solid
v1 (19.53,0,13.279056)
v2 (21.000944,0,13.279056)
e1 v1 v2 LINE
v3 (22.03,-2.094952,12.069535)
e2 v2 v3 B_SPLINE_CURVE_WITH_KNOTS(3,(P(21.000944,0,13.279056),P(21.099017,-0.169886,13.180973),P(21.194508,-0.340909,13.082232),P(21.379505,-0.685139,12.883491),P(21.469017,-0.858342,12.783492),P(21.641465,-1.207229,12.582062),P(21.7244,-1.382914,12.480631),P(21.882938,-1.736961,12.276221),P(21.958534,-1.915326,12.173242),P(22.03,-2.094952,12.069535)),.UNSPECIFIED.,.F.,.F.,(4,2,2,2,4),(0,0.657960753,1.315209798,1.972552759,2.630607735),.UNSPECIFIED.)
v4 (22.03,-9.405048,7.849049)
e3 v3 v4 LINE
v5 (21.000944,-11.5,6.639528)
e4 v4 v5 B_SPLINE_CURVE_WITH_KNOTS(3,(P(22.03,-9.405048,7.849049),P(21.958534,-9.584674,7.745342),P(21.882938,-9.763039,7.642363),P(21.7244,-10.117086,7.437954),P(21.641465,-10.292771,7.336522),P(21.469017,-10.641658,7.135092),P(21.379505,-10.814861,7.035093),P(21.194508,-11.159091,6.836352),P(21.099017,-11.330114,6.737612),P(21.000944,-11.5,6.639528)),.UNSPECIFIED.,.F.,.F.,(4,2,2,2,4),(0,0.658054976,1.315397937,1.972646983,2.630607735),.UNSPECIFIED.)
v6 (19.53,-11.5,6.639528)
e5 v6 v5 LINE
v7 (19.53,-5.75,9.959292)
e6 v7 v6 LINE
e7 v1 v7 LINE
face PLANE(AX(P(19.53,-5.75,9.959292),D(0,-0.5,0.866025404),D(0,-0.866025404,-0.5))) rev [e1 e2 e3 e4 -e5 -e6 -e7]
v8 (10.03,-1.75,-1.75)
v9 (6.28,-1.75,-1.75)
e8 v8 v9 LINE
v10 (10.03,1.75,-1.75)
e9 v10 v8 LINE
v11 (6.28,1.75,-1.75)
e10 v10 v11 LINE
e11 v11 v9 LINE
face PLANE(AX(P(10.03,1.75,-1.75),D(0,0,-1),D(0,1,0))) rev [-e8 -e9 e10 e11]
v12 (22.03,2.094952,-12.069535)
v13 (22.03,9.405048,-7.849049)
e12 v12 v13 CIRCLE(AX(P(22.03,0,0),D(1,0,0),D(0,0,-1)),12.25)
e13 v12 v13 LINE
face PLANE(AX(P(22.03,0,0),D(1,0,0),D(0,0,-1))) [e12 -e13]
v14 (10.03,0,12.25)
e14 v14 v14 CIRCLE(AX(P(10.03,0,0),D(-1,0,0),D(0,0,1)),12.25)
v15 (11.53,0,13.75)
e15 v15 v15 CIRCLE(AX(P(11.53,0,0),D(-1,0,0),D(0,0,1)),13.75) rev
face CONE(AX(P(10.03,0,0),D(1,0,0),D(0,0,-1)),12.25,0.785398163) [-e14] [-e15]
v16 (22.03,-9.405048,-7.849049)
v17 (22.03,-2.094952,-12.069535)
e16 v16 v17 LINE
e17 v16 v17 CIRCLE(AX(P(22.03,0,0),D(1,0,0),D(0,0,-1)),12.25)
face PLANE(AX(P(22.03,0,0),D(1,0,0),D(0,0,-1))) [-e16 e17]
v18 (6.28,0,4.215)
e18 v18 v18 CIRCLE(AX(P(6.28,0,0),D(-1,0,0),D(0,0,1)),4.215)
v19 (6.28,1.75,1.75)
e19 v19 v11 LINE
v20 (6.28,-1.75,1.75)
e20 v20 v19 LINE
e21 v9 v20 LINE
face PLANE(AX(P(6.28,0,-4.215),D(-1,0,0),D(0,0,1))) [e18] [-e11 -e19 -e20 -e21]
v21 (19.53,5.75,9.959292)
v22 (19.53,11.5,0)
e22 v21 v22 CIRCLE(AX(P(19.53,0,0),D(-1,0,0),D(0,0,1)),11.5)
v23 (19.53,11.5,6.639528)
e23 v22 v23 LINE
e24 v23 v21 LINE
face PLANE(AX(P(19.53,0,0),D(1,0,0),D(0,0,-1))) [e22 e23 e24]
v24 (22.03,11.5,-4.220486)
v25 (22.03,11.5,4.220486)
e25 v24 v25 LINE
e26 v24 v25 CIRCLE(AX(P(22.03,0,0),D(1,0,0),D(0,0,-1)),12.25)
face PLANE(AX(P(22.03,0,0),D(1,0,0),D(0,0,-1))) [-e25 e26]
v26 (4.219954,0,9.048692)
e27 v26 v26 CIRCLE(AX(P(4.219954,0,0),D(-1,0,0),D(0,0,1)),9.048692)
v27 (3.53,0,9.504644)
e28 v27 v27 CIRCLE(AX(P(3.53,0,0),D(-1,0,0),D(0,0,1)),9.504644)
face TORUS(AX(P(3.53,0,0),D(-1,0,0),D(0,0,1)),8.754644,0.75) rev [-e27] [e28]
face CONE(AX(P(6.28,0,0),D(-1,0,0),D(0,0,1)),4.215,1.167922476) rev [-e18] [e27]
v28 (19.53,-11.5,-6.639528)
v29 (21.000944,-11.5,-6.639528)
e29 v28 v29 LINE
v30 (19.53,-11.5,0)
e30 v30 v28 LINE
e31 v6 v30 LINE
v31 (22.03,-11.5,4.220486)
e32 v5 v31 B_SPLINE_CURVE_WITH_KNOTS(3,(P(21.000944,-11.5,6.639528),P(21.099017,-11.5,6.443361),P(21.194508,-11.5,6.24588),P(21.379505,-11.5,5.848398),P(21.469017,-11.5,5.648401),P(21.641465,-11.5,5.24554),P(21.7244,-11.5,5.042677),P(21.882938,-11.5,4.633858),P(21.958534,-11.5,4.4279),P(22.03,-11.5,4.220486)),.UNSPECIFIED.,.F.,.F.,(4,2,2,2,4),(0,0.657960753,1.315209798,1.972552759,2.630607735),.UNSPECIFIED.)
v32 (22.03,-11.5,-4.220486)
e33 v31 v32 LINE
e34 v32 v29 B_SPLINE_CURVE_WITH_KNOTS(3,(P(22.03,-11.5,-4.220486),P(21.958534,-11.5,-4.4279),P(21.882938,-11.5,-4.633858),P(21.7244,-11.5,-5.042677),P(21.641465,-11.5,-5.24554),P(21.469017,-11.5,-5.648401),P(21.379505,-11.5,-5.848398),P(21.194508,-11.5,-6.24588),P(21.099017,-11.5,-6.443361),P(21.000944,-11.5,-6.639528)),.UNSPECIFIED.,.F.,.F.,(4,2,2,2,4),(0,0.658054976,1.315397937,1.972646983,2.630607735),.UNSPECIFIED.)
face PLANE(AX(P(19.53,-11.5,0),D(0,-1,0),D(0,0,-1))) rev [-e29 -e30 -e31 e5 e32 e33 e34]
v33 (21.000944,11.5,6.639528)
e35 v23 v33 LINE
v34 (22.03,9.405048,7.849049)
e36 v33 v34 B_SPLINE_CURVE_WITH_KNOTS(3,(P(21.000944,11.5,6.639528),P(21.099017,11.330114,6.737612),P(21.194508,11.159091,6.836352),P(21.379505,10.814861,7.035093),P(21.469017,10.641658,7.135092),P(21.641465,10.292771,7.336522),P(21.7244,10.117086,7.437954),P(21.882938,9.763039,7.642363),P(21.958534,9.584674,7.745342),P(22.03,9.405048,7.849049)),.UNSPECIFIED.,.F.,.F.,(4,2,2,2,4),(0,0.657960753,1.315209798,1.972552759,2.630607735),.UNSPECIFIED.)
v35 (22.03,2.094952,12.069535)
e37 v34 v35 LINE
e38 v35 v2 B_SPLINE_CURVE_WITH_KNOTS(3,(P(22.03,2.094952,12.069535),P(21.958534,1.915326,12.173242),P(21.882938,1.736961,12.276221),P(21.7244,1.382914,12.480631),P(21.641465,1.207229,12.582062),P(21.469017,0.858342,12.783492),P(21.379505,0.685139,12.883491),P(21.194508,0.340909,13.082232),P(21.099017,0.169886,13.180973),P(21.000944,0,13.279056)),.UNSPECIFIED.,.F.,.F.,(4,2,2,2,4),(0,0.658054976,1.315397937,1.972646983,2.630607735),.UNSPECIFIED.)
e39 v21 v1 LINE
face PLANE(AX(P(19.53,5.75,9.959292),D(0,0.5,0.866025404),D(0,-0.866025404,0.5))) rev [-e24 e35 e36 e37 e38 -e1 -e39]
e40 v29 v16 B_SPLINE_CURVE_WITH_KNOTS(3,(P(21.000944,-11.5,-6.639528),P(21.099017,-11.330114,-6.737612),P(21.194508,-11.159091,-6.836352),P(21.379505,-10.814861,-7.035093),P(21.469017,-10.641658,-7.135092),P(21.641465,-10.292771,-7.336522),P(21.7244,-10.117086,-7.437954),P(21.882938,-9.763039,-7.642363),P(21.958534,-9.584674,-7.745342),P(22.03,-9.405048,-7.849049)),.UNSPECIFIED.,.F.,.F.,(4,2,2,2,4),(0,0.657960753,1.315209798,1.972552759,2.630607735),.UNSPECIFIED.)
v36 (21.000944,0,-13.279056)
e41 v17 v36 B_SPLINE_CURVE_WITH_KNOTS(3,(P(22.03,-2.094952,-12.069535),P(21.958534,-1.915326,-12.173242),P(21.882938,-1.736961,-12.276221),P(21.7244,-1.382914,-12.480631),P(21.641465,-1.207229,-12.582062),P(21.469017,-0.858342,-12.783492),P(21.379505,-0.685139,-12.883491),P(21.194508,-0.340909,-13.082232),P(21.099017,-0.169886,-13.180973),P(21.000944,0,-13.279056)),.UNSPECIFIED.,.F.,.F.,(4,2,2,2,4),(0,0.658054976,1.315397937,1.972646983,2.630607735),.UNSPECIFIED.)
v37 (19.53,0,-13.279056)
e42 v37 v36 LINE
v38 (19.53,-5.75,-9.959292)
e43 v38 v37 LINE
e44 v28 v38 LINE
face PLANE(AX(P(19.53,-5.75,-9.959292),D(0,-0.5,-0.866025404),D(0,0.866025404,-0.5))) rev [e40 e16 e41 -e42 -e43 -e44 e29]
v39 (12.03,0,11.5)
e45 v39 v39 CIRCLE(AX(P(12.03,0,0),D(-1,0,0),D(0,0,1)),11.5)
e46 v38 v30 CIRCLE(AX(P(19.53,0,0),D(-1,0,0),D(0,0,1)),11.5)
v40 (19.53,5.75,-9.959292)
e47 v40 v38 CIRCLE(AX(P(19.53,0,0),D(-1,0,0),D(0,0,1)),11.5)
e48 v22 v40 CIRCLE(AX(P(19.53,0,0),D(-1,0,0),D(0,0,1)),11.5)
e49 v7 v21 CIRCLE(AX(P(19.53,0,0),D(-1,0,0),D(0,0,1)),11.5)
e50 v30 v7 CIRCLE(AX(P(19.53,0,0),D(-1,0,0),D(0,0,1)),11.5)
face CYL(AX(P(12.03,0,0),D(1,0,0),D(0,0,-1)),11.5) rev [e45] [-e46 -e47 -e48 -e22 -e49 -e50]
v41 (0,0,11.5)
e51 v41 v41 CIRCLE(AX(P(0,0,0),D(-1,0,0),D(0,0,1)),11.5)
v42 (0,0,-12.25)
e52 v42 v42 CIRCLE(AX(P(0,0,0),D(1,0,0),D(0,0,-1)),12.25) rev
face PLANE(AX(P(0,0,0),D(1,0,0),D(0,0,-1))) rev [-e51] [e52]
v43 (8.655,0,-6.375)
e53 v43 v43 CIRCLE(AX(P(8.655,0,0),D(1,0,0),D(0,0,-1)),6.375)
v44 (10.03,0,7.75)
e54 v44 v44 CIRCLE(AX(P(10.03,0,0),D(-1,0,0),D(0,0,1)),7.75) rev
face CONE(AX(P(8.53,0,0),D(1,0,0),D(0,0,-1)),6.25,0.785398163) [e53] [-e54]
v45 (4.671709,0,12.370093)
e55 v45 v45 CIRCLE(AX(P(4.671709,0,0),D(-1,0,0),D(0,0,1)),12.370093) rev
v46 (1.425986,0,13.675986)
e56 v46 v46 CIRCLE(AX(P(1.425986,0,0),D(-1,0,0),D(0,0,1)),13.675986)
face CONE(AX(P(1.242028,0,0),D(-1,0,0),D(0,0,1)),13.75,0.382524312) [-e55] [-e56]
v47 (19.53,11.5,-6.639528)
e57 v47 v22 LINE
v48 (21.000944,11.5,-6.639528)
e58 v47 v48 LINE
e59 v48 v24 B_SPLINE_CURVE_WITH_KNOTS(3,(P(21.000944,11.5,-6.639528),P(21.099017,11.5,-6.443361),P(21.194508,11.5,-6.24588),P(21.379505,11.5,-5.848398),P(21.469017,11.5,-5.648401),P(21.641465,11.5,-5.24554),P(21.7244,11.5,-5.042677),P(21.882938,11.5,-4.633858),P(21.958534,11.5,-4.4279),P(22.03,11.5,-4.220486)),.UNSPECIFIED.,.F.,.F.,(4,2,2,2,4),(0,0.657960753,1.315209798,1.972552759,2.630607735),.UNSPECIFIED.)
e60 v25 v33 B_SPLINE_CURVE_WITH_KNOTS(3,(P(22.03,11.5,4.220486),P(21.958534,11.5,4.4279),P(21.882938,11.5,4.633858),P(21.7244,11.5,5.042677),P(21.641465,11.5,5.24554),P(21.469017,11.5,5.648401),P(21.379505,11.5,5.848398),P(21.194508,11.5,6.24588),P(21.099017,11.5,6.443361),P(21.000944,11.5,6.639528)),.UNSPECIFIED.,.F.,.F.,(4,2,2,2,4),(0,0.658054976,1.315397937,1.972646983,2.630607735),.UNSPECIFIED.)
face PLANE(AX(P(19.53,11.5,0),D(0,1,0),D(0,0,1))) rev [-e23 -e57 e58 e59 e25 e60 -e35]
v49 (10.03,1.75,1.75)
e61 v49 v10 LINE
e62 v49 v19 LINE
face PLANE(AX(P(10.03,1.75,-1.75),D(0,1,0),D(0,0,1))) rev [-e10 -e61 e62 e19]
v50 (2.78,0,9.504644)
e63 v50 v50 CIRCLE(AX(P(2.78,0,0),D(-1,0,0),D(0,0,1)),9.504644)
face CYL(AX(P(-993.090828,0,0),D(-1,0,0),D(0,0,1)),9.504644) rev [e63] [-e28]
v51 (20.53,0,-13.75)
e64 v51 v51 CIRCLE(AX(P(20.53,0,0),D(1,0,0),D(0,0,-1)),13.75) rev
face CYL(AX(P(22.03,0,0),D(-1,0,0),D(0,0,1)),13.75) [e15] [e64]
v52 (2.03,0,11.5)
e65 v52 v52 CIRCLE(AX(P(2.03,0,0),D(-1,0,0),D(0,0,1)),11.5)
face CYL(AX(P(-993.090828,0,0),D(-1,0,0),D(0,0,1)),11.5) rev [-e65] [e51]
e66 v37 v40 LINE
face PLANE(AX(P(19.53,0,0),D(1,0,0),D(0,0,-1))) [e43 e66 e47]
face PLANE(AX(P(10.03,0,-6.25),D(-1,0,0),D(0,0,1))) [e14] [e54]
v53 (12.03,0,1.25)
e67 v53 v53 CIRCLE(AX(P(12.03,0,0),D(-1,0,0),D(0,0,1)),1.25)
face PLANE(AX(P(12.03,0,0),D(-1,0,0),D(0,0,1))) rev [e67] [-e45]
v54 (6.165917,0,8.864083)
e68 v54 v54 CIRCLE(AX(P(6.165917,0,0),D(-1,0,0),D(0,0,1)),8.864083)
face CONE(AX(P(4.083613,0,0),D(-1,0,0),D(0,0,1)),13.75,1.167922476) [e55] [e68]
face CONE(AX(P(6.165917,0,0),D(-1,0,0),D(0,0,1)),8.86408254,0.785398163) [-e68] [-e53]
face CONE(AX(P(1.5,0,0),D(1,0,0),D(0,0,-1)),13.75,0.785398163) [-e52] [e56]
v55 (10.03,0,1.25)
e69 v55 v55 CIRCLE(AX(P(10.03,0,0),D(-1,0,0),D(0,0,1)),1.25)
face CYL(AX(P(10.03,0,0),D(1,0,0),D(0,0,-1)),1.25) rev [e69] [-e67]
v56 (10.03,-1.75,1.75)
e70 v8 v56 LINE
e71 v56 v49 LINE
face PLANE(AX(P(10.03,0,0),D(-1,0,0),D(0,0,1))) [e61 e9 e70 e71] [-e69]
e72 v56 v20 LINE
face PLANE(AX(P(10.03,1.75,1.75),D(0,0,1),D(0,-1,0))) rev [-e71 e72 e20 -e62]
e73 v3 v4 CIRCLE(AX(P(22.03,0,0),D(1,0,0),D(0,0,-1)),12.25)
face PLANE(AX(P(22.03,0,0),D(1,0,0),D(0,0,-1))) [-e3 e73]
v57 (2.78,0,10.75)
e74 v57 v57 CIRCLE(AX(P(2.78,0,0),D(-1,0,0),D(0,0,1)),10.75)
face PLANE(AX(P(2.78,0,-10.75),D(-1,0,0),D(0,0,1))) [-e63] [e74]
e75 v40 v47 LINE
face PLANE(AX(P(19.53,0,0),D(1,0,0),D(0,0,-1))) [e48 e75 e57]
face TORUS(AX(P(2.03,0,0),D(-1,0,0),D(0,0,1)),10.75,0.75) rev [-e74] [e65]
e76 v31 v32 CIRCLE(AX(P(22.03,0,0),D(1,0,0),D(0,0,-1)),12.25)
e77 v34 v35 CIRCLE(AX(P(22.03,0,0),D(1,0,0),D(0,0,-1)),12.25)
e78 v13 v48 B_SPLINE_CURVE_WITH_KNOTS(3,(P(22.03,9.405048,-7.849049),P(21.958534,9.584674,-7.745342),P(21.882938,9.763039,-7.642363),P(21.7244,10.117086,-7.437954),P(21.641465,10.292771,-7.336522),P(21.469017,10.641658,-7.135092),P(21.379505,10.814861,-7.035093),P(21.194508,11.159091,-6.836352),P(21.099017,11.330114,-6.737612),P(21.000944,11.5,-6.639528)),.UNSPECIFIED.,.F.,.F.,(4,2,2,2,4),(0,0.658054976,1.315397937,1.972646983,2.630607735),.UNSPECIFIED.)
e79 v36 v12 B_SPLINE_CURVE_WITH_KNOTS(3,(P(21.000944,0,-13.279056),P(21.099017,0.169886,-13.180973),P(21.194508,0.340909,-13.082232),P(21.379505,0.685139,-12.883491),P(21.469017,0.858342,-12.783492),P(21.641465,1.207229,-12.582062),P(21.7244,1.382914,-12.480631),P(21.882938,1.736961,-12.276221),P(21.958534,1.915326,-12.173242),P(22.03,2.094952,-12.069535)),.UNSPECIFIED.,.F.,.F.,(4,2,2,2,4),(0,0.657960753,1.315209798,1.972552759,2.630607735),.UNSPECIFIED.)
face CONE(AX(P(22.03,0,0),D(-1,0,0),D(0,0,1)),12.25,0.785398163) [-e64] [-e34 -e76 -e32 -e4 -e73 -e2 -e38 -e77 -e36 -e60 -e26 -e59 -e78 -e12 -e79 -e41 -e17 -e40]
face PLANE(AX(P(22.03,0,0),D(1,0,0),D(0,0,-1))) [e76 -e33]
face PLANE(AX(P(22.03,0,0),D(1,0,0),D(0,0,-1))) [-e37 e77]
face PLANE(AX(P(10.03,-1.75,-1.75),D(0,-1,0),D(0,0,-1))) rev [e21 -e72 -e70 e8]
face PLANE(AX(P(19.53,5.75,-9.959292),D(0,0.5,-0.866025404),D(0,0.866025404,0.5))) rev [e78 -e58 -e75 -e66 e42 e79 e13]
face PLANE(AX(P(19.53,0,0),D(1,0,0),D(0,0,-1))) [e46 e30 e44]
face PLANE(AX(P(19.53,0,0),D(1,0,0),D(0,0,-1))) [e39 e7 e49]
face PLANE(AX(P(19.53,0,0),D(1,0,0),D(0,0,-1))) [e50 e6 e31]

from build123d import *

# Parameters (mm, degrees)
SKETCH1_R           = 13.75
BOSS_EXTRUDE1_DEPTH = 22.03
SKETCH3_W           = 3.5
SKETCH3_H           = 3.5
CUT_EXTRUDE1_DEPTH  = 3.75
CUT_EXTRUDE2_START  = -12
CUT_EXTRUDE2_DEPTH  = 2.5
CUT_EXTRUDE4_START  = -9.5
SKETCH4_29_R        = 11.5
CUT_EXTRUDE4_DEPTH  = 7.5
CUT_EXTRUDE5_START  = -2
SKETCH4_30_R        = 1.25
CUT_EXTRUDE5_DEPTH  = 2
CHAMFER1_SIZE       = 1.5
CHAMFER2_SIZE       = 1.5
CHAMFER2_SIZE_2     = 2.841585372


# Read off the part's stored shape, not the designer's step: Cut-Revolve-Thin1
with BuildPart() as part:
    # Sketch1 → Boss-Extrude1 (new body)
    with BuildSketch(Plane(origin=(0, 0, 0), x_dir=(0, 0, -1), z_dir=(1, 0, 0))):
        Circle(SKETCH1_R)
    extrude(amount=BOSS_EXTRUDE1_DEPTH)

    # Sketch2 → Cut-Revolve1 (revolve, cut)
    with BuildSketch(Plane(origin=(46.159172163, 0, 11.54266395), x_dir=(0, 0, 1), z_dir=(0, 1, 0)), mode=Mode.PRIVATE) as cut_revolve1_sk:
        with BuildLine():
            Line((-22.29266395, -43.379172163), (-21.047307804, -43.379172163))
            Line((-21.047307804, -43.379172163), (-21.047307804, -42.629172163))
            ThreePointArc((-21.047307804, -42.629172163), (-20.923021734, -42.215672371), (-20.591355596, -41.939218617))
            Line((-20.591355596, -41.939218617), (-15.75766395, -39.879172163))
            Line((-15.75766395, -39.879172163), (-11.54266395, -39.879172163))
            Line((-11.54266395, -39.879172163), (-11.54266395, -46.159172163))
            Line((-11.54266395, -46.159172163), (-23.04266395, -46.159172163))
            Line((-23.04266395, -46.159172163), (-23.04266395, -44.129172163))
            ThreePointArc((-23.04266395, -44.129172163), (-22.822994036, -43.598842077), (-22.29266395, -43.379172163))
        make_face()
    revolve(cut_revolve1_sk.sketch.rotate(Axis((-993.090827837, 0, 0), (1, 0, 0)), 180), axis=Axis((-993.090827837, 0, 0), (1, 0, 0)), mode=Mode.SUBTRACT)

    # Sketch3 → Cut-Extrude1 (cut)
    with BuildSketch(Plane.ZY.offset(-6.28)):
        Rectangle(SKETCH3_W, SKETCH3_H)
    extrude(amount=-CUT_EXTRUDE1_DEPTH, mode=Mode.SUBTRACT)

    # Sketch4 → Cut-Extrude2 (cut)
    with BuildSketch(Plane(origin=(10.03, 32, 0), x_dir=(0, 0, 1), z_dir=(-1, 0, 0)).offset(CUT_EXTRUDE2_START)):
        Polygon((-6.639528096, -20.5), (-13.279056191, -32), (-6.639528096, -43.5), (6.639528096, -43.5), (13.279056191, -32), (6.639528096, -20.5), align=None)
    extrude(amount=CUT_EXTRUDE2_DEPTH, mode=Mode.SUBTRACT)

    # Sketch4<29> → Cut-Extrude4 (cut)
    with BuildSketch(Plane(origin=(10.03, 32, 0), x_dir=(0, 0, 1), z_dir=(-1, 0, 0)).offset(CUT_EXTRUDE4_START)):
        with Locations((0, -32)):
            Circle(SKETCH4_29_R)
    extrude(amount=CUT_EXTRUDE4_DEPTH, mode=Mode.SUBTRACT)

    # Sketch4<30> → Cut-Extrude5 (cut)
    with BuildSketch(Plane(origin=(10.03, 32, 0), x_dir=(0, 0, 1), z_dir=(-1, 0, 0)).offset(CUT_EXTRUDE5_START)):
        with Locations((0, -32)):
            Circle(SKETCH4_30_R)
    extrude(amount=CUT_EXTRUDE5_DEPTH, mode=Mode.SUBTRACT)

    # Cut-Revolve-Thin1 outline → Cut-Revolve-Thin1 (revolve, cut)
    with BuildSketch(Plane.YX):
        Polygon((13.75, 10.03), (6.25, 10.03), (6.25, 7.28), (13.75, 4.083613153), align=None)
    revolve(axis=Axis((0, 0, 0), (1, 0, 0)), mode=Mode.SUBTRACT)

    # Chamfer1
    # the kernel refuses this chamfer: 1.5 mm, written as the material it adds along each edge
    with BuildSketch(Plane(origin=(10.03, 0, 0), x_dir=(0, 1, 0), z_dir=(0, 0, -1))) as chamfer1_piece_1:
        Polygon((6.25, -CHAMFER1_SIZE), (6.25 + CHAMFER1_SIZE, 0), (6.25, 0), align=None)
    revolve(axis=Axis((10.03, 0, 0), (1, 0, 0)))
    # the kernel refuses this chamfer: 1.5 mm, written as the material it takes off along each edge
    with BuildSketch(Plane(origin=(0, 0, 0), x_dir=(0, 0, -1), z_dir=(0, -1, 0))) as chamfer1_2_piece_1:
        Polygon((13.75, CHAMFER1_SIZE), (13.75 - CHAMFER1_SIZE, 0), (13.75, 0), align=None)
    revolve(axis=Axis((0, 0, 0), (1, 0, 0)), mode=Mode.SUBTRACT)
    with BuildSketch(Plane(origin=(22.03, 0, 0), x_dir=(0, 0, -1), z_dir=(0, -1, 0))) as chamfer1_2_piece_2:
        Polygon((13.75, -CHAMFER1_SIZE), (13.75 - CHAMFER1_SIZE, 0), (13.75, 0), align=None)
    revolve(axis=Axis((22.03, 0, 0), (1, 0, 0)), mode=Mode.SUBTRACT)
    with BuildSketch(Plane(origin=(10.03, 0, 0), x_dir=(0, 0, -1), z_dir=(0, 1, 0))) as chamfer1_2_piece_3:
        Polygon((13.75 - CHAMFER1_SIZE, 0), (13.75, -CHAMFER1_SIZE), (13.75, 0), align=None)
    revolve(axis=Axis((10.03, 0, 0), (-1, 0, 0)), mode=Mode.SUBTRACT)

    # Chamfer2
    # the kernel refuses this chamfer: 2.841585372, 1.5 mm, written as the material it adds along each edge
    with BuildSketch(Plane(origin=(7.28, 0, 0), x_dir=(0, 1, 0), z_dir=(0, 0, -1))) as chamfer2_piece_1:
        Polygon((6.25, CHAMFER2_SIZE), (6.25 + CHAMFER2_SIZE_2 * 0.919938061778, -CHAMFER2_SIZE_2 * 0.392063722763), (6.25, 0), align=None)
    revolve(axis=Axis((7.28, 0, 0), (1, 0, 0)))
    # the kernel refuses this chamfer: 2.841585372, 1.5 mm, written as the material it takes off along each edge
    with BuildSketch(Plane(origin=(4.083613153, 0, 0), x_dir=(0, 1, 0), z_dir=(0, 0, -1))) as chamfer2_2_piece_1:
        Polygon((13.75 - CHAMFER2_SIZE * 0.919938061679, CHAMFER2_SIZE * 0.392063722721), (13.75, -CHAMFER2_SIZE_2), (13.75, 0), align=None)
    revolve(axis=Axis((4.083613153, 0, 0), (1, 0, 0)), revolution_arc=270, mode=Mode.SUBTRACT)
    with BuildSketch(Plane(origin=(4.083613153, 0, 0), x_dir=(0, 0, -1), z_dir=(0, -1, 0))) as chamfer2_2_piece_2:
        Polygon((13.75 - CHAMFER2_SIZE * 0.919938061679, CHAMFER2_SIZE * 0.392063722721), (13.75, -CHAMFER2_SIZE_2), (13.75, 0), align=None)
    revolve(axis=Axis((4.083613153, 0, 0), (1, 0, 0)), revolution_arc=90, mode=Mode.SUBTRACT)


solid = part.part
